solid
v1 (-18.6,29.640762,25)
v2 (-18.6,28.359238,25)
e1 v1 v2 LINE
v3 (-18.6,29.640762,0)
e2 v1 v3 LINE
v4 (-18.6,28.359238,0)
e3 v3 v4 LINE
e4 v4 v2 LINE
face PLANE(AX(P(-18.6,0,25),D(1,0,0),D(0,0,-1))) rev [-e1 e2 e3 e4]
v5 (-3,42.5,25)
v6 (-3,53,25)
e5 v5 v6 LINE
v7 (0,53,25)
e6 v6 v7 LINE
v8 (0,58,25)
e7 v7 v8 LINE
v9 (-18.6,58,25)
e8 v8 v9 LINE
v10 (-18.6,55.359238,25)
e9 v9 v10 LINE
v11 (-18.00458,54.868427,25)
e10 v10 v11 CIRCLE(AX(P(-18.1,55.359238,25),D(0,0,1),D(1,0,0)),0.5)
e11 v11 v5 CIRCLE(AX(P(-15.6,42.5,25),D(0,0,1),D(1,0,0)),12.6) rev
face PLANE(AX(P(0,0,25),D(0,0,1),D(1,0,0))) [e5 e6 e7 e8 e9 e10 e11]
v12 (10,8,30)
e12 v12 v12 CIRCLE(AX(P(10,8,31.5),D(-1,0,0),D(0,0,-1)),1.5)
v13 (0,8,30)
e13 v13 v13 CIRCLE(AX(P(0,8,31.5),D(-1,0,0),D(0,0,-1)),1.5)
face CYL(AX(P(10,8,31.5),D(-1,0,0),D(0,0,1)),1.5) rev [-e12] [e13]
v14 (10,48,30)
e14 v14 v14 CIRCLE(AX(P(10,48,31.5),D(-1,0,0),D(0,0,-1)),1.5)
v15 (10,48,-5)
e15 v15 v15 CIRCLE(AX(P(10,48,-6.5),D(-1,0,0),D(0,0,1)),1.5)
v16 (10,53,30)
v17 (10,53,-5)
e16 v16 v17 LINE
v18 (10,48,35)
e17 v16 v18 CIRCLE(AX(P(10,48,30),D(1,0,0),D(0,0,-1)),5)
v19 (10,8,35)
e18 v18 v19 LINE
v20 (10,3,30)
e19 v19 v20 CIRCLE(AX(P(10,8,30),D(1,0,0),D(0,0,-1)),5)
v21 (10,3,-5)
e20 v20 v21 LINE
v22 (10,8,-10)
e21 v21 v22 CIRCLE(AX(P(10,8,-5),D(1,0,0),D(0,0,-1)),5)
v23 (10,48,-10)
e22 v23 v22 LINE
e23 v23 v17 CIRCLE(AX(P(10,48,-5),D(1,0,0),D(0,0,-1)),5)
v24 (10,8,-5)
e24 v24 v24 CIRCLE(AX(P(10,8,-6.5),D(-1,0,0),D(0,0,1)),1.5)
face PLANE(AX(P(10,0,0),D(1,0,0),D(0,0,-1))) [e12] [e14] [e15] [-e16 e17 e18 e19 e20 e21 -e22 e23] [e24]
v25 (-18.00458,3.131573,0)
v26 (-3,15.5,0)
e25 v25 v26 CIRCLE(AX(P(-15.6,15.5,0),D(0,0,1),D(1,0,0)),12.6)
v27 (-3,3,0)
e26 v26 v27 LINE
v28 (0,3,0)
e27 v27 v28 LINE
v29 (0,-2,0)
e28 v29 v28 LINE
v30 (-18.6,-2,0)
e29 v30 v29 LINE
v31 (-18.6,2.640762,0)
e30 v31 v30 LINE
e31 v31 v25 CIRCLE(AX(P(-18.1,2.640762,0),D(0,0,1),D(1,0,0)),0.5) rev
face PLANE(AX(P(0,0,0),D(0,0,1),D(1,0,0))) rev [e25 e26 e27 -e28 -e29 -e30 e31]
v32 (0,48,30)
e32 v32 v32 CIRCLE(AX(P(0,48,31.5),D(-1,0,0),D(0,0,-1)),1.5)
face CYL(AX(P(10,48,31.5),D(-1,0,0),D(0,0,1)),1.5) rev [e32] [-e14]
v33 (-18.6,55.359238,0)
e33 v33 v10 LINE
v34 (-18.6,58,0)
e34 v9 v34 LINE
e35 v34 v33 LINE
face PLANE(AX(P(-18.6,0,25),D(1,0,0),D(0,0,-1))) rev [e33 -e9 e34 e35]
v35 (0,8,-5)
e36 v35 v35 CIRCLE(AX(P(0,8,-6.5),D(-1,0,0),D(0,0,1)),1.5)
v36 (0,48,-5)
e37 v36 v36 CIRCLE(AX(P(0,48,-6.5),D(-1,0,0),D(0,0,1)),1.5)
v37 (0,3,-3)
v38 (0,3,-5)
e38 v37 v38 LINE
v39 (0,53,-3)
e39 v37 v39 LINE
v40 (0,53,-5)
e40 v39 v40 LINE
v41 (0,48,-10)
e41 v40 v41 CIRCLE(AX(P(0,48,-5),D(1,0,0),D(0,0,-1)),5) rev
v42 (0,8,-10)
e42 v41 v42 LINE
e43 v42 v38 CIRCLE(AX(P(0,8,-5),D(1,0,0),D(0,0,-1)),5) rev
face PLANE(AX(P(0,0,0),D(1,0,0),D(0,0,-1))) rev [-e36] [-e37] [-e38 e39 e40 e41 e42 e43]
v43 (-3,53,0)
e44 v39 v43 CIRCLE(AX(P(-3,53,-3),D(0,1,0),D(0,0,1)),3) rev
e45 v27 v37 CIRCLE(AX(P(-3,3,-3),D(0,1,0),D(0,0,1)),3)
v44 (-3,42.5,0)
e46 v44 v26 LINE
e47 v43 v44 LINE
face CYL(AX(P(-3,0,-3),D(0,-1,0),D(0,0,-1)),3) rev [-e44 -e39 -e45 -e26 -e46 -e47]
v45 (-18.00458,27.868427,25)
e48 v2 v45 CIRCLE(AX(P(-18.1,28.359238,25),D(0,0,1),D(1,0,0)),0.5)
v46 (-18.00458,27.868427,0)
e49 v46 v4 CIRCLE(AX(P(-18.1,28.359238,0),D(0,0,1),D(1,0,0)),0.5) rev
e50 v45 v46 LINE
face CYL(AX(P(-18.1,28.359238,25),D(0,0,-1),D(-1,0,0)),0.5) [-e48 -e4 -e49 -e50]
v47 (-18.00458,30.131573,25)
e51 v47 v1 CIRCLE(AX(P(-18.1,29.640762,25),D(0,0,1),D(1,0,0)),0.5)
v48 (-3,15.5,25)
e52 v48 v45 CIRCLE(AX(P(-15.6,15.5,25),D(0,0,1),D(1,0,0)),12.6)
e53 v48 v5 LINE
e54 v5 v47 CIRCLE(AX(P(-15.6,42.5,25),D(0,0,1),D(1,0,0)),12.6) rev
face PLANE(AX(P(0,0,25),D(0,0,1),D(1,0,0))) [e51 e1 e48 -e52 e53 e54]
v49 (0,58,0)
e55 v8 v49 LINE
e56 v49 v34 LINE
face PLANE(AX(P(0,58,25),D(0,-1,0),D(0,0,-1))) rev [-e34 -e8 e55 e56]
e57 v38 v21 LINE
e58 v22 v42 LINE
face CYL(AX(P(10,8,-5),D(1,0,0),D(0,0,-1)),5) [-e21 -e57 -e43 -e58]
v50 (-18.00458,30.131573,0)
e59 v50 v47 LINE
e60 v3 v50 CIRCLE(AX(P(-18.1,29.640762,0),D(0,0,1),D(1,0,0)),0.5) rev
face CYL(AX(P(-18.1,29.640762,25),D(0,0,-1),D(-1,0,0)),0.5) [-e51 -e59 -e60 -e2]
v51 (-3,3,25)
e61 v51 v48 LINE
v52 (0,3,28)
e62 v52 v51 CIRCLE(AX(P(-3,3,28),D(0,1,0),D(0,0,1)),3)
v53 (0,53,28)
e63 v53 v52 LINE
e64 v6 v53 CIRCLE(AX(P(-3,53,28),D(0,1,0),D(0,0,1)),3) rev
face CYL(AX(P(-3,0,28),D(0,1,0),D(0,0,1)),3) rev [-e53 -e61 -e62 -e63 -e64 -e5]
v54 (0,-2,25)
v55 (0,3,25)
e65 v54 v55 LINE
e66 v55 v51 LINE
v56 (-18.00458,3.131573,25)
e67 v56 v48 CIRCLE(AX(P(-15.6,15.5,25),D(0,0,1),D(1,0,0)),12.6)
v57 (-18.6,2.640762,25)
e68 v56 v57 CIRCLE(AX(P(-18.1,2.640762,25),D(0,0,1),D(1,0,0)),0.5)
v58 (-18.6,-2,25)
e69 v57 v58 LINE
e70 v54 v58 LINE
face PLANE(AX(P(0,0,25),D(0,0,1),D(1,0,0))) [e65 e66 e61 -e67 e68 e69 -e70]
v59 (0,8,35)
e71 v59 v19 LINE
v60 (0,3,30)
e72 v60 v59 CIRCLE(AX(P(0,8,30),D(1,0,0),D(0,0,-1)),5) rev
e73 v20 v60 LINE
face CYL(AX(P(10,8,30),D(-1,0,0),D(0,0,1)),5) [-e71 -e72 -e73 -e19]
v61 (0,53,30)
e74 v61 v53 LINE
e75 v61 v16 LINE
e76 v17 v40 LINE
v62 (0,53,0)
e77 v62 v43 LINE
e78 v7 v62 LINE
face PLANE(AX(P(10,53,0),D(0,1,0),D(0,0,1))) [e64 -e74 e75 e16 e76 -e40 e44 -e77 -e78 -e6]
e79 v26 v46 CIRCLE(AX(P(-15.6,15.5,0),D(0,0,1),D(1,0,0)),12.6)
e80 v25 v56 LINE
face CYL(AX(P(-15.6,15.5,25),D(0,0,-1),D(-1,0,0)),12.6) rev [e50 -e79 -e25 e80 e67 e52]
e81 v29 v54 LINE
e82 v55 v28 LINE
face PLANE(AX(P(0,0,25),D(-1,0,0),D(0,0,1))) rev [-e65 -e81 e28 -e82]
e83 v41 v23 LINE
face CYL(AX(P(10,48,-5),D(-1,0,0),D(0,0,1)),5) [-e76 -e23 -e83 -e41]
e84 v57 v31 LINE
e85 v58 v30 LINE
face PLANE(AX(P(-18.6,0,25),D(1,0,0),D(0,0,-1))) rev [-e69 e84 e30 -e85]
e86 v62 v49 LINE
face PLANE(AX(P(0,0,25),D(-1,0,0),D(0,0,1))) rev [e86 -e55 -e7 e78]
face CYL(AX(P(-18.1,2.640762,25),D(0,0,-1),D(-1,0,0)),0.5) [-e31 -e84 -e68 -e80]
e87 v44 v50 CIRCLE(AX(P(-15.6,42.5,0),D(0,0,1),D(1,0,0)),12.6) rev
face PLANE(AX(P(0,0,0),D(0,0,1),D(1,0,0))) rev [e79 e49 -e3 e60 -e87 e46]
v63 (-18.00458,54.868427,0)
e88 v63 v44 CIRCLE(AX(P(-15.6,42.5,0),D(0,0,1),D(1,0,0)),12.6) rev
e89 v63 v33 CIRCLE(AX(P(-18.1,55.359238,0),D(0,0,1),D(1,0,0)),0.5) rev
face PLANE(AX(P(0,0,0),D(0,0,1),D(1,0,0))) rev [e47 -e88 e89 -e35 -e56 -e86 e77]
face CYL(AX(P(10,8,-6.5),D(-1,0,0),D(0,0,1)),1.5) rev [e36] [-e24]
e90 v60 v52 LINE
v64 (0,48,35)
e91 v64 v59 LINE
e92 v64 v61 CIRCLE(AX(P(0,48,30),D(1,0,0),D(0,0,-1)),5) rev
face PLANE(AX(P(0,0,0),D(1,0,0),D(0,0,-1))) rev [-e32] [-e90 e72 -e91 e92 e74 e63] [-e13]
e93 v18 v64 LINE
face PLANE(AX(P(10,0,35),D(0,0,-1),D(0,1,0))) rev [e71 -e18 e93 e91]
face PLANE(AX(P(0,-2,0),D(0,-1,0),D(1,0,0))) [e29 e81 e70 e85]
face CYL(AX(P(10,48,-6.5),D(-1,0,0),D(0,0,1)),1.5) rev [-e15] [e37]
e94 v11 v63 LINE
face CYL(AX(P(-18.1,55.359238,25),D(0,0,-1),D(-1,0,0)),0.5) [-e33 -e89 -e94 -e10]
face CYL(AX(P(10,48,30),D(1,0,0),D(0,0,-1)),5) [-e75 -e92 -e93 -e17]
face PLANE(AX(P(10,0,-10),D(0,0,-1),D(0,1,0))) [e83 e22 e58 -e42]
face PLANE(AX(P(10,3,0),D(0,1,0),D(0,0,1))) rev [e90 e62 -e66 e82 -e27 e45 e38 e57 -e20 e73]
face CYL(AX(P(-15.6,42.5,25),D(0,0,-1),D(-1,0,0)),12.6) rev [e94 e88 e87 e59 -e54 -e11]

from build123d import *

# Parameters (mm, degrees)
BOSS_EXTRUDE1_DEPTH = 25
SKETCH2_W           = 18.6
SKETCH2_H           = 25
BOSS_EXTRUDE2_DEPTH = 2
FILLET1_R           = 0.5
SKETCH3_W           = 12.5
SKETCH3_H           = 50
SKETCH3_W_2         = 10
BOSS_EXTRUDE3_DEPTH = 10
FILLET2_R           = 3
SKETCH4_R           = 1.5
CUT_EXTRUDE1_DEPTH  = 71.249270459
FILLET3_R           = 5


with BuildPart() as part:
    # Sketch1 → Boss-Extrude1 (new body)
    with BuildSketch(Plane.XY):
        with BuildLine():
            Line((-18.6, 0), (0, 0))
            Line((0, 0), (0, 58))
            Line((0, 58), (-18.6, 58))
            Line((-18.6, 58), (-18.6, 54.737646833))
            ThreePointArc((-18.6, 54.737646833), (-7.823111162, 52.413626985), (-3, 42.5))
            ThreePointArc((-3, 42.5), (-7.823111162, 32.586373015), (-18.6, 30.262353167))
            Line((-18.6, 30.262353167), (-18.6, 27.737646833))
            ThreePointArc((-18.6, 27.737646833), (-7.823111162, 25.413626985), (-3, 15.5))
            ThreePointArc((-3, 15.5), (-7.823111162, 5.586373015), (-18.6, 3.262353167))
            Line((-18.6, 3.262353167), (-18.6, 0))
        make_face()
    extrude(amount=BOSS_EXTRUDE1_DEPTH)

    # Sketch2 → Boss-Extrude2 (add)
    with BuildSketch(Plane.XZ):
        with Locations((-9.3, 12.5)):
            Rectangle(SKETCH2_W, SKETCH2_H)
    extrude(amount=BOSS_EXTRUDE2_DEPTH)

    # Fillet1
    fillet1_edges = [part.edges().sort_by_distance(p)[0] for p in [
        (-18.6, 3.262353167, 12.5),
        (-18.6, 27.737646833, 12.5),
        (-18.6, 30.262353167, 12.5),
        (-18.6, 54.737646833, 12.5),
    ]]
    fillet(fillet1_edges, radius=FILLET1_R)

    # Sketch3 → Boss-Extrude3 (add)
    with BuildSketch(Plane(origin=(0, 0, 0), x_dir=(0, 0, -1), z_dir=(1, 0, 0))):
        with Locations((-18.75, 28)):
            Rectangle(SKETCH3_W, SKETCH3_H)
        with Locations((-6.25, 28)):
            Rectangle(SKETCH3_W, SKETCH3_H)
        with Locations((5, 28)):
            Rectangle(SKETCH3_W_2, SKETCH3_H)
        with Locations((-30, 28)):
            Rectangle(SKETCH3_W_2, SKETCH3_H)
    extrude(amount=BOSS_EXTRUDE3_DEPTH)

    # Fillet2
    fillet2_edges = [part.edges().sort_by_distance(p)[0] for p in [
        (0, 28, 0),
        (0, 28, 25),
    ]]
    fillet(fillet2_edges, radius=FILLET2_R - 0.0001)  # a hair under: the kernel refuses the full size

    # Sketch4 → Cut-Extrude1 (cut, through all)
    with BuildSketch(Plane.ZY):
        with Locations((-6.5, 48)):
            Circle(SKETCH4_R)
        with Locations((-6.5, 8)):
            Circle(SKETCH4_R)
        with Locations(Location((31.5, 8, 0), (0, 0, 180))):
            Circle(SKETCH4_R)
        with Locations(Location((31.5, 48, 0), (0, 0, 180))):
            Circle(SKETCH4_R)
    extrude(amount=-CUT_EXTRUDE1_DEPTH, mode=Mode.SUBTRACT)

    # Fillet3
    fillet3_edges = [part.edges().sort_by_distance(p)[0] for p in [
        (5, 3, 35),
        (5, 3, -10),
        (5, 53, -10),
        (5, 53, 35),
    ]]
    fillet(fillet3_edges, radius=FILLET3_R)


solid = part.part
